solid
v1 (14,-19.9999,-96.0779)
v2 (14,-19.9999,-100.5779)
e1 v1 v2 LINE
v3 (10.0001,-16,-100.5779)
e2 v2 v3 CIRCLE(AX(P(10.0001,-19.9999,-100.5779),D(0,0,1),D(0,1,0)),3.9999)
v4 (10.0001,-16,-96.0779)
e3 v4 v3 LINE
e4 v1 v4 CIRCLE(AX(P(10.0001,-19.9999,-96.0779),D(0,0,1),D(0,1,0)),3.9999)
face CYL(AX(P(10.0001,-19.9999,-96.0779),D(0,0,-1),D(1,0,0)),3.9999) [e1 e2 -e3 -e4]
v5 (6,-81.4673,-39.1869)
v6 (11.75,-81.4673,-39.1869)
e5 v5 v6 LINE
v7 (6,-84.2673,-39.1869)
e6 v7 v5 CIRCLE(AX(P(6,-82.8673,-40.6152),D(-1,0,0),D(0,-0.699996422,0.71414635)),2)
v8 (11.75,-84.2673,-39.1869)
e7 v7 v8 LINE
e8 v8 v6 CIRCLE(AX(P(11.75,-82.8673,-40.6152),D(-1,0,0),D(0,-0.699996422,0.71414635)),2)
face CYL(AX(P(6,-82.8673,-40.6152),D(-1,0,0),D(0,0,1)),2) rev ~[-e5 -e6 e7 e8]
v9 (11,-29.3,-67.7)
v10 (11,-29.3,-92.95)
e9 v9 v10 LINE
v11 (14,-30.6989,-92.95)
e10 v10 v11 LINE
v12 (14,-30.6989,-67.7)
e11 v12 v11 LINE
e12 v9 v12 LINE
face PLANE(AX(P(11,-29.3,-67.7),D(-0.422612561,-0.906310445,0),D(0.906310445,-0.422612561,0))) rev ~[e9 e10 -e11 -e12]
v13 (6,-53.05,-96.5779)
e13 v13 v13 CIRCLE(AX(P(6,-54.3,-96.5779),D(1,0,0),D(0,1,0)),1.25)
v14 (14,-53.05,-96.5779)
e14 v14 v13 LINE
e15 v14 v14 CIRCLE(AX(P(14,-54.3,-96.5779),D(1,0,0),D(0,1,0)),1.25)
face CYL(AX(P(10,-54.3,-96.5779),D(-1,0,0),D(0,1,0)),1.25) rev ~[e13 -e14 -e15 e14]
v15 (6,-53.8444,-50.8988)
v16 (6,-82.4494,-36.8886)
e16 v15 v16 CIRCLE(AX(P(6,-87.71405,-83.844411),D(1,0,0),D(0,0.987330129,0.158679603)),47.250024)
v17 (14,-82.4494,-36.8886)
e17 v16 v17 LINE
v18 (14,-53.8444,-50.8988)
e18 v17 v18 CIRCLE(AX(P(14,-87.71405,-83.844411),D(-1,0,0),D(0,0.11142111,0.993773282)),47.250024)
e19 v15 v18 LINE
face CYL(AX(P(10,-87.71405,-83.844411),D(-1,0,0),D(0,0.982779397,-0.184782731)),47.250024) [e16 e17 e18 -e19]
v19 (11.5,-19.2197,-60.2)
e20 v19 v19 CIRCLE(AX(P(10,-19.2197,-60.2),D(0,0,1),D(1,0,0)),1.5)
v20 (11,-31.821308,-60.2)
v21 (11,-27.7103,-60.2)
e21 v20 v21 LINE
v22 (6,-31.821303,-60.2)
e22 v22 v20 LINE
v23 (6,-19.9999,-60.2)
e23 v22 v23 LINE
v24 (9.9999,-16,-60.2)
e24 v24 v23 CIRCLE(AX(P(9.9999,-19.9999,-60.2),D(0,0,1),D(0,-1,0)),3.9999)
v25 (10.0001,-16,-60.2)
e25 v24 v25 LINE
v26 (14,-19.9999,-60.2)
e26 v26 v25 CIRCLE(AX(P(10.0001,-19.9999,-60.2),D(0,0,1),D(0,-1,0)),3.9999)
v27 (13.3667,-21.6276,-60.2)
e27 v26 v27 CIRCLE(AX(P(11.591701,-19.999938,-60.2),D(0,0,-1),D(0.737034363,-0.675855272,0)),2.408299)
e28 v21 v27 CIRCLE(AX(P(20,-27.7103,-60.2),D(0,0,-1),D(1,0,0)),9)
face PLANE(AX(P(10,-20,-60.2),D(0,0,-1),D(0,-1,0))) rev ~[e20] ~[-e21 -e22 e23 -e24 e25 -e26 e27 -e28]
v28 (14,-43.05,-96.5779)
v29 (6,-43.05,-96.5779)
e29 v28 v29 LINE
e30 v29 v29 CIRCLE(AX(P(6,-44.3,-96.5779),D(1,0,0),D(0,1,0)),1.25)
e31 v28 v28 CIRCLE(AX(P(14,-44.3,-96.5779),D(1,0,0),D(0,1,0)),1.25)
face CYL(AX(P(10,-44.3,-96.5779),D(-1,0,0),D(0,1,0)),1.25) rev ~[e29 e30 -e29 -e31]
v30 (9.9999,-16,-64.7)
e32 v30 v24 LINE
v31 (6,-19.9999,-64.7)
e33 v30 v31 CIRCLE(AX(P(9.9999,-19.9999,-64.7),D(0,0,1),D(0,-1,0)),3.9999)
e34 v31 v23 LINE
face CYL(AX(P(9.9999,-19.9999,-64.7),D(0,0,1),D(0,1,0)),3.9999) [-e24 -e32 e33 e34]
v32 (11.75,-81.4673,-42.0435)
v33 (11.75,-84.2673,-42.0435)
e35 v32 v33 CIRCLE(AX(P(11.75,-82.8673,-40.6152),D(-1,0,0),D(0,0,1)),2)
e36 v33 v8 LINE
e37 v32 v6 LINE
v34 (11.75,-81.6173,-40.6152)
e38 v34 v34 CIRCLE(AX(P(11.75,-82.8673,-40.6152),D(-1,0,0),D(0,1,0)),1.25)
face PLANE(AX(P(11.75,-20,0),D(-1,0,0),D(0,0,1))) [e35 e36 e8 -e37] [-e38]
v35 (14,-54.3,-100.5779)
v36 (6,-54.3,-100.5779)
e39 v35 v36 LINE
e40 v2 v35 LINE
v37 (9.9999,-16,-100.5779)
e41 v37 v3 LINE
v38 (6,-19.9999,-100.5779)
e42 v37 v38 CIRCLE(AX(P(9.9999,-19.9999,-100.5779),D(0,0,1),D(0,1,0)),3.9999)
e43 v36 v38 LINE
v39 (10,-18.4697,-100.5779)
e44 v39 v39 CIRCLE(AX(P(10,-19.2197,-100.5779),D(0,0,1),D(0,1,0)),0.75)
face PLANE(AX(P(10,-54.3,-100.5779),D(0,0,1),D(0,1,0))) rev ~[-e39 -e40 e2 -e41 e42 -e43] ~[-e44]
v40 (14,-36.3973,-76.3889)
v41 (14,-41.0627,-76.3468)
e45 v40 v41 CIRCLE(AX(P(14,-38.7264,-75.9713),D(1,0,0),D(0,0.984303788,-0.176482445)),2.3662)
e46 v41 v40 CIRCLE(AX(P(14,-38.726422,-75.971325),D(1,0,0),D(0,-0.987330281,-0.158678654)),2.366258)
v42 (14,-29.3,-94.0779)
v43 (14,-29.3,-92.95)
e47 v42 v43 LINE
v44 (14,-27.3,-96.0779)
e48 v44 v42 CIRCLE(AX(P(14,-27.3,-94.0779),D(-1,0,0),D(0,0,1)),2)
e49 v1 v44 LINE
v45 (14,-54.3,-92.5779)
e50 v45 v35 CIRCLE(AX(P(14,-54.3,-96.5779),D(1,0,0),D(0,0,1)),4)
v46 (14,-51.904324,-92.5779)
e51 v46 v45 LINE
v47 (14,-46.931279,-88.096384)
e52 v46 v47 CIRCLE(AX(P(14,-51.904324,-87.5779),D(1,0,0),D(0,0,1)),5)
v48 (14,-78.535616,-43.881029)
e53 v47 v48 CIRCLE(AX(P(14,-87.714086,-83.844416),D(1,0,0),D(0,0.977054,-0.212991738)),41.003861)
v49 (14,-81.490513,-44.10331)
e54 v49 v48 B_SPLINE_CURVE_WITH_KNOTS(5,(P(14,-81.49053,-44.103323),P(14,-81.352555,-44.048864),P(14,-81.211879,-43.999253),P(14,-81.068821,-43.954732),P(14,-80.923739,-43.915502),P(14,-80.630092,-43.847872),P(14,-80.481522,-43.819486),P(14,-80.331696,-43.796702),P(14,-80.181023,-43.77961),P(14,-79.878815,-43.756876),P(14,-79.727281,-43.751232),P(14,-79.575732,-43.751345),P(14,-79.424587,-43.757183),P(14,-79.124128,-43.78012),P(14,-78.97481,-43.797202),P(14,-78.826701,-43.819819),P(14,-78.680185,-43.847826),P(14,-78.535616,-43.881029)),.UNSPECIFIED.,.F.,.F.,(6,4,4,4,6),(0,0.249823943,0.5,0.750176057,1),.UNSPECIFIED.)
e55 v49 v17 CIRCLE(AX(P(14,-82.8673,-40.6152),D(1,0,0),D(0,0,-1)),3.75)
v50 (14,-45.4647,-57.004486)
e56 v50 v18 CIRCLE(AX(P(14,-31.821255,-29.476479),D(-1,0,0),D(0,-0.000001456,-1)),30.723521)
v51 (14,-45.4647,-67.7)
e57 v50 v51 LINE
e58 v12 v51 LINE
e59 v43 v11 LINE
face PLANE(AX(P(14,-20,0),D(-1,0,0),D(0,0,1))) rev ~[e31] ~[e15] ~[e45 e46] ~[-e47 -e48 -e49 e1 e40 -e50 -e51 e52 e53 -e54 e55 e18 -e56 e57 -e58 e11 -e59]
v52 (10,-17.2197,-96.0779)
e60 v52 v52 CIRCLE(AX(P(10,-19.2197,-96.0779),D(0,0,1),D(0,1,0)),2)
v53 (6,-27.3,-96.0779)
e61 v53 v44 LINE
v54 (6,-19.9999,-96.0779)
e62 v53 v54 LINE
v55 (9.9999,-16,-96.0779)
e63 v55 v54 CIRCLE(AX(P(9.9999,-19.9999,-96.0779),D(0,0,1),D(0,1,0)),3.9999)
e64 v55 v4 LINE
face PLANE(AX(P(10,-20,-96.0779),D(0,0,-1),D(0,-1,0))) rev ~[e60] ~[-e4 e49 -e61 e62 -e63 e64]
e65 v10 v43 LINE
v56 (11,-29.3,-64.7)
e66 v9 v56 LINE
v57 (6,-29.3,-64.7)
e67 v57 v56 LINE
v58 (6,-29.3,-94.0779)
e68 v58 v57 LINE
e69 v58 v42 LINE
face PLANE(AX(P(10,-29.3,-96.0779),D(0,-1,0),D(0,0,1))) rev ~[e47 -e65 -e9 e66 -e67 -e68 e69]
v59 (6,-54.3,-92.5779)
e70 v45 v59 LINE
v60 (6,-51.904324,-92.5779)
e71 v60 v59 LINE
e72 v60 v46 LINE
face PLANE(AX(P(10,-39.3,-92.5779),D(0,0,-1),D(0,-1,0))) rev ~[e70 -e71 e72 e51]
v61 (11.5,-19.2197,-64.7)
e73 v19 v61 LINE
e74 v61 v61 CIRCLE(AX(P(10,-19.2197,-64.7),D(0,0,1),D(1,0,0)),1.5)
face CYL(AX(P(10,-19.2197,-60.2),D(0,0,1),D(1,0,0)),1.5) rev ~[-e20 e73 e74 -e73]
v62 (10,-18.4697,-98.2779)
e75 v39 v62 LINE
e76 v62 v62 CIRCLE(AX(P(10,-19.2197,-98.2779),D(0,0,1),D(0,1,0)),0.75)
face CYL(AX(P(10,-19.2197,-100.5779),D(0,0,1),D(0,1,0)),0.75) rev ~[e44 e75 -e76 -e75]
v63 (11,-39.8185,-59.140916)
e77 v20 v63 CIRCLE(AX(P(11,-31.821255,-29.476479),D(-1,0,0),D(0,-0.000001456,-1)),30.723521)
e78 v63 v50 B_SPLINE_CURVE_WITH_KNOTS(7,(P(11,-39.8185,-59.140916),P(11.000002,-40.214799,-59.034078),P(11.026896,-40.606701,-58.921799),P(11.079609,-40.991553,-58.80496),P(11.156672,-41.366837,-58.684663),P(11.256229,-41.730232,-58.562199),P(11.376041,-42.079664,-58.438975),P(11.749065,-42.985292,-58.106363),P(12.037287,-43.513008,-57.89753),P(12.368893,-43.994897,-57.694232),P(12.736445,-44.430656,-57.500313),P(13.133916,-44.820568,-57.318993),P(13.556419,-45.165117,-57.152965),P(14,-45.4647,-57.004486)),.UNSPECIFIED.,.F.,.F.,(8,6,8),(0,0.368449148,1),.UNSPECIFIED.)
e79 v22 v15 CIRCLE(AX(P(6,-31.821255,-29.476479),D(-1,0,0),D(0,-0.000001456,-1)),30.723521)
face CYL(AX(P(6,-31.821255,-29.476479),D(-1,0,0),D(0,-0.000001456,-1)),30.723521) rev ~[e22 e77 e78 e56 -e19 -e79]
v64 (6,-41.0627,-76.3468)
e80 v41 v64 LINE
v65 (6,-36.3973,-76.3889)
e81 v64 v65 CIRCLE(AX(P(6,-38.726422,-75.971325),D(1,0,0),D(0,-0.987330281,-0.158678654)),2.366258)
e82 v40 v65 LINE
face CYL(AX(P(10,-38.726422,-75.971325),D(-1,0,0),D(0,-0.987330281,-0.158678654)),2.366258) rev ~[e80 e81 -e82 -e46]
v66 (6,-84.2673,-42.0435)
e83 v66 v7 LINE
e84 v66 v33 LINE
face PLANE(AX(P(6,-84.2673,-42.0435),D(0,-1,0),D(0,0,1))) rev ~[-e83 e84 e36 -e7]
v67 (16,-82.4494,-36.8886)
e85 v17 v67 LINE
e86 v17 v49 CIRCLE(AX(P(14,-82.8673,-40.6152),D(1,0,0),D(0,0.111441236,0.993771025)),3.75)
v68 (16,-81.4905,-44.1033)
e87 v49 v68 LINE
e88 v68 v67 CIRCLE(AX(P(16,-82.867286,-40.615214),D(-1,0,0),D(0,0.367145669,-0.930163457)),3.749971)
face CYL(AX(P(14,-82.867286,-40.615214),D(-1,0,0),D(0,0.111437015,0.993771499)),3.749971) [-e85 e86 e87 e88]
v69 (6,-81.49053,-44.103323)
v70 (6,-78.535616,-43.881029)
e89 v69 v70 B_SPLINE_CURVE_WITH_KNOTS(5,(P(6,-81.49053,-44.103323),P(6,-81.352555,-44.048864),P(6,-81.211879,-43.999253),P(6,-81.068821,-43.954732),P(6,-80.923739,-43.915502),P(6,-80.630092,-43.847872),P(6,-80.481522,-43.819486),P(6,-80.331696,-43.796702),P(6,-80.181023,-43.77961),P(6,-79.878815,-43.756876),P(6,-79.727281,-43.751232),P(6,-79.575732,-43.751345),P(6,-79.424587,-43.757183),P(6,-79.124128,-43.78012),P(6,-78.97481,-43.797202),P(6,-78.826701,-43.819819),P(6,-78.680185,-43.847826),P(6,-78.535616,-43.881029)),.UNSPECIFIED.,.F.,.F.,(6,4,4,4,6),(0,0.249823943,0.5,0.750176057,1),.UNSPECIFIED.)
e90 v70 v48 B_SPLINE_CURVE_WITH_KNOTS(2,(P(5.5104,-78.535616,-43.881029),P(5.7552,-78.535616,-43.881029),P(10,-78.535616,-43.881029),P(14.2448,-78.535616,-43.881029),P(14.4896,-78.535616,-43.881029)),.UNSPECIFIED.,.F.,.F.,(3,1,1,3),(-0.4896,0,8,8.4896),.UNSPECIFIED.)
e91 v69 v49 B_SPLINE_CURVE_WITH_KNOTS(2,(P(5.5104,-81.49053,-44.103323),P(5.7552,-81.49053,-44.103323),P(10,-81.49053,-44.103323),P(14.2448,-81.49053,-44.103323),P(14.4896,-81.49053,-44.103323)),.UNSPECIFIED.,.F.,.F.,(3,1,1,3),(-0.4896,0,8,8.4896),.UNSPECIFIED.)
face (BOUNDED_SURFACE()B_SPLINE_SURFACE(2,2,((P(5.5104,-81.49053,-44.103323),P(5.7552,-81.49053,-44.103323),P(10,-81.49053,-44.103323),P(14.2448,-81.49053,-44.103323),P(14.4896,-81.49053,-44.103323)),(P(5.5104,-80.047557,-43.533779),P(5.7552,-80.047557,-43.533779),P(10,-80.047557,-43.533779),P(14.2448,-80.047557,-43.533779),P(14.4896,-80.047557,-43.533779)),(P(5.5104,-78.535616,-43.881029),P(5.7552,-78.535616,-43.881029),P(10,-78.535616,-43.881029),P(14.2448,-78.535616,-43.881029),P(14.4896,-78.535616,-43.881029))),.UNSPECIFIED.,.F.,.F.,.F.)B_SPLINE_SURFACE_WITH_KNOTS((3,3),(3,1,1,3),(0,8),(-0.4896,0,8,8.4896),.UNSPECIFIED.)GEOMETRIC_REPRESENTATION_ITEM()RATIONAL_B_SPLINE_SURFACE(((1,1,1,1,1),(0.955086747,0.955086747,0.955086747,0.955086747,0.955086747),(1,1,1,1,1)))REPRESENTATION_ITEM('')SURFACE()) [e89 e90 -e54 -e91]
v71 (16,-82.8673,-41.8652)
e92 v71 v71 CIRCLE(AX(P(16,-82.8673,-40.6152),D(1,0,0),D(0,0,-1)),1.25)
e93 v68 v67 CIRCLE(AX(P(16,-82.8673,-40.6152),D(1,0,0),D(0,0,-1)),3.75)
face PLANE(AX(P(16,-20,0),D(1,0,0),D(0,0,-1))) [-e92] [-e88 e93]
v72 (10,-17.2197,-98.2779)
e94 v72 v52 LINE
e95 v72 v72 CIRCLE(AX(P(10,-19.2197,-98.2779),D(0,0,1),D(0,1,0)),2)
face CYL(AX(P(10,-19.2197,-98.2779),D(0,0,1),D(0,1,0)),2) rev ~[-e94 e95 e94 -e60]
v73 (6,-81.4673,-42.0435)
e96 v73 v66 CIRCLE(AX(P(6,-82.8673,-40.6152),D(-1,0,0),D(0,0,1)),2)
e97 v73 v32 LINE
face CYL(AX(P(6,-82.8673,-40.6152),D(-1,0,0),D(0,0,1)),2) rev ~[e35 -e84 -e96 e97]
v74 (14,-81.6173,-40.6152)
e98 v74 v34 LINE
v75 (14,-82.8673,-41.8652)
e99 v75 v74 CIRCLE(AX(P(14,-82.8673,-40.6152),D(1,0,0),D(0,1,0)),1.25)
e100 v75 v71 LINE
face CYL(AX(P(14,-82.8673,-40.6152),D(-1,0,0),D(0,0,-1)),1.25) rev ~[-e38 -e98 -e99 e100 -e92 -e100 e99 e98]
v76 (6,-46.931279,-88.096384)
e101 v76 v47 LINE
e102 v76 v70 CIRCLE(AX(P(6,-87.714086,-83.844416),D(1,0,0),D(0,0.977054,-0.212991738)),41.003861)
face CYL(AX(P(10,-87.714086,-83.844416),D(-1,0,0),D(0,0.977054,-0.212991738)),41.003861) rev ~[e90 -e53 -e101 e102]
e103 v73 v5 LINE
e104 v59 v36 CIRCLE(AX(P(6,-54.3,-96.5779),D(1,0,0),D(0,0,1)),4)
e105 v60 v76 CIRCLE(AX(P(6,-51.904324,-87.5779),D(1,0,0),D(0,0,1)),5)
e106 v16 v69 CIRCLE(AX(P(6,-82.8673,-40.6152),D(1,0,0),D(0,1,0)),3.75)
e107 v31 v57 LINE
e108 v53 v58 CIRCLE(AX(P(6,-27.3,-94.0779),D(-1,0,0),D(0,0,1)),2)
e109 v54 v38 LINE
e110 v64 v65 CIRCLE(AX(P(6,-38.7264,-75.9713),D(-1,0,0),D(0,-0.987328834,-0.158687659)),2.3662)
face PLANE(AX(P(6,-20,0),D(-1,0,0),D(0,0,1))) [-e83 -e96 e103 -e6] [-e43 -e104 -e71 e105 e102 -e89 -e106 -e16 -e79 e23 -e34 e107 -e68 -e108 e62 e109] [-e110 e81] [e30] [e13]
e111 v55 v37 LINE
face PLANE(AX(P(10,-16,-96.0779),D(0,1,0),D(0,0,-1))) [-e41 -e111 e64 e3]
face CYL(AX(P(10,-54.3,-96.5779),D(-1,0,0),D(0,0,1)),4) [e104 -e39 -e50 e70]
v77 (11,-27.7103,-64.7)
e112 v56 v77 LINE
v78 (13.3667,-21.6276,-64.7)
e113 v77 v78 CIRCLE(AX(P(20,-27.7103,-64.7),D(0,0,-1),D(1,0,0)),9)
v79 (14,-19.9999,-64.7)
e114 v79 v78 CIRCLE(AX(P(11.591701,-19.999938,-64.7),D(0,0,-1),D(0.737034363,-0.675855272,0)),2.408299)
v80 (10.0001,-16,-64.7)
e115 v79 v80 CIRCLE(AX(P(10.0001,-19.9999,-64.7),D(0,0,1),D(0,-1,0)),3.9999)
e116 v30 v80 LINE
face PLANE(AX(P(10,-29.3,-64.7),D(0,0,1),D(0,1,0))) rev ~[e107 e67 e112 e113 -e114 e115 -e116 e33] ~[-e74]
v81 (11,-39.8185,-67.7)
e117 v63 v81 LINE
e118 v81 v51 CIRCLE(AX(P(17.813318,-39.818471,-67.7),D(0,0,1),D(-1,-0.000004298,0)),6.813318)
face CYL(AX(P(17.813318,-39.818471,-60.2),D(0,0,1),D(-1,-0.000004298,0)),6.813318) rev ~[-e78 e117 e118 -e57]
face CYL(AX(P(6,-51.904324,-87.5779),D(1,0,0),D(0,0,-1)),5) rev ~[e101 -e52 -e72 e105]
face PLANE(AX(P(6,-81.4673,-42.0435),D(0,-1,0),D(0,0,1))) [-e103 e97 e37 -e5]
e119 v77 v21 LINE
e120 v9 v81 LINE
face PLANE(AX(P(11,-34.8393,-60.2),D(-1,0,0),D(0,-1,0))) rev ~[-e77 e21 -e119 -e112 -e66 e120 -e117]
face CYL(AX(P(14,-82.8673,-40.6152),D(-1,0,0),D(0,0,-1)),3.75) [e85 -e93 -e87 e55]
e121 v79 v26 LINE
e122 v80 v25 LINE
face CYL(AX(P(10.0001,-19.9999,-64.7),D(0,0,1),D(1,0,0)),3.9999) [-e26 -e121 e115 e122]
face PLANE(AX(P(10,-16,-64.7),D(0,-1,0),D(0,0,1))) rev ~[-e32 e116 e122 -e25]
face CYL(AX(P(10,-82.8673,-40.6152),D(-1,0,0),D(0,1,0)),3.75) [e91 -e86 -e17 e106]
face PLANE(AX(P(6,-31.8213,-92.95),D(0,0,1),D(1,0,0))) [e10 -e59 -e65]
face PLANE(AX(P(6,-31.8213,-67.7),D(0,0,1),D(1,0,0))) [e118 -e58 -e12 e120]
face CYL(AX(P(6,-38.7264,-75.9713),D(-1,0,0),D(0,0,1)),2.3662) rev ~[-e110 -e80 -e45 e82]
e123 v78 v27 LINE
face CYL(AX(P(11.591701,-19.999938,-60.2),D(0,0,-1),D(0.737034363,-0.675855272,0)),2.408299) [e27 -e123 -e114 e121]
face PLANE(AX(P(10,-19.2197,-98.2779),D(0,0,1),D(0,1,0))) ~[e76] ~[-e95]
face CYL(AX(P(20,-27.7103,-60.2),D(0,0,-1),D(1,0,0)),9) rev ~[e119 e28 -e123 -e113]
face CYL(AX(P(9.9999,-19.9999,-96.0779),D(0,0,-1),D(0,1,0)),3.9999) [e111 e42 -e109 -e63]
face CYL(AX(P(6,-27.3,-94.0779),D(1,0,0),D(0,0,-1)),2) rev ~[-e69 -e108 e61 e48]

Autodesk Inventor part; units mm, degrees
ref_plane "YZ Plane" through (0, 0, 0) normal (1, 0, 0) x (0, 1, 0)
ref_plane "XZ Plane" through (0, 0, 0) normal (0, 1, 0) x (-1, 0, 0)
ref_plane "plane_main" through (10, -20, 0) normal (1, 0, 0) x (0, 1, 0)
sketch "Sketch1" plane through (10, -20, 0) normal (1, 0, 0) x (0, 1, 0)
  line L0 (0, -108) -> (0, 18)
  line L1 (20, -86.5) -> (15.45, -86.5) projected
  line L2 (-1.875, -97.5779) -> (1.875, -97.5779) projected
  line L3 (-2.5, -65.2) -> (2.5, -65.2) projected
  line L4 (4, -96.0779) -> (-9.3, -96.0779)
  line L5 (-9.3, -96.0779) -> (-9.3, -64.7)
  line L6 (-9.3, -64.7) -> (4, -64.7)
  line L7 (4, -64.7) -> (4, -60.2)
  line L8 (4, -60.2) -> (-13.4946, -60.2)
  line L9 (-13.4946, -60.2) -> (-19.3, -92.5779)
  line L10 (-19.3, -92.5779) -> (-34.3, -92.5779)
  line L11 (-34.3, -92.5779) -> (-34.3, -100.5779) construction
  line L12 (-34.3, -100.5779) -> (4, -100.5779)
  line L13 (4, -96.0779) -> (4, -100.5779)
  line L14 (-7.3, -86.5) -> (-7.3, -65.2) projected
  arc A0 (-34.3, -92.5779) -> (-34.3, -100.5779) centre (-34.3, -96.5779) ccw
  circle A1 centre (-34.3, -96.5779) radius 1.25
  circle A2 centre (-24.3, -96.5779) radius 1.25
  line L15 (-34.3, -96.5779) -> (-24.3, -96.5779) construction
  point P0 (20, 0)
  dimension "d0" = 0.5
  dimension "d1" = 1.5
  dimension "d2" = 4.5
  dimension "d3" = 4.5
  dimension "d4" = 8
  dimension "d7" = 31.3779
  dimension "d8" = 2.5
  dimension "d9" = 10
  dimension "d10" = 15
  dimension "d11" = 10
  dimension "d12" = 2
  dimension "d21" = 4
  dimension "d22" = 4
extrude "ext_main" add sketch "Sketch1" along normal mid plane 8 contours L12 A0 L10 L9 L8 L0 L6 L5 L4 | L0 L4 L13 L12 | L0 L8 L7 L6
fillet "Fillet1" radius 2 3 edges at (10, -39.3, -92.5779) (10, -33.4946, -60.2) (10, -29.3, -96.0779)
sketch "Sketch3" plane through (6, -16, -60.2) normal (0, 0, 1) x (1, 0, 0)
  circle A0 centre (4, -3.2197) radius 1.5
  point P0 (-6, 16)
  dimension "d17" = 3
extrude "ext_cut_topbore" cut sketch "Sketch3" against normal up to surface (4.5 mm away)
fillet "Fillet2" radius 4 4 edges at (14, -16, -62.45) (6, -16, -62.45) (14, -16, -98.3279) (6, -16, -98.3279)
ref_plane "Work Plane2" through (6, -31.8213, -60.2) normal (0, 0, 1) x (1, 0, 0)
sketch "Sketch5" plane through (6, -31.8213, -60.2) normal (0, 0, 1) x (1, 0, 0)
  line L0 (8, 11.8213) -> (8, 0) projected
  circle A0 centre (14, 4.111) radius 9
  circle A1 centre (4, 12.6016) radius 1.5 projected
  arc A2 (8, 11.8213) -> (0, 11.8213) centre (4, 11.8213) ccw projected
  arc A3 (7.3667, 10.1937) -> (8, 11.8213) centre (5.5918, 11.8213) ccw
  line L1 (8, 11.8213) -> (8, 10.8192)
  line L2 (5, 4.111) -> (5, -4.889)
  line L3 (5, -4.889) -> (14, -4.889)
  point P0 (-6, 31.8213)
  point P1 (4, 12.611)
  dimension "d27" = 18
  dimension "d28" = 8.5
  dimension "d29" = 10
extrude "ext_cut_motor_cutway" cut sketch "Sketch5" along normal mid plane 15 contours L0 A0 A3 | A0 | A0 L3 L2
fillet "Fillet4" [suppressed]
sketch "Sketch6" plane through (10, -20, 0) normal (1, 0, 0) x (0, 1, 0)
  line L0 (0, -96.0779) -> (0, -96.0779) projected
  line L1 (-7.3, -96.0779) -> (0, -96.0779) projected
  line L2 (0, -96.0779) -> (-7.3, -96.0779) projected
  line L3 (0, -100.5779) -> (0, -100.5779) projected
  line L4 (-34.3, -100.5779) -> (0, -100.5779) projected
  line L5 (0, -100.5779) -> (-34.3, -100.5779) projected
  line L6 (0.7803, -108) -> (0.7803, 18) construction
  line L7 (0.7803, -96.0779) -> (0.7803, -100.5779)
  line L8 (1.5303, -100.5779) -> (1.5303, -98.2779)
  line L9 (1.5303, -98.2779) -> (2.7803, -98.2779)
  line L10 (2.7803, -98.2779) -> (2.7803, -96.0779)
  line L11 (2.7803, -96.0779) -> (0.7803, -96.0779)
  line L12 (0, -96.0779) -> (-7.3, -96.0779) projected
  line L13 (0.7803, -100.5779) -> (1.5303, -100.5779)
  line L14 (-34.3, -100.5779) -> (0, -100.5779) projected
  point P0 (20, 0)
  dimension "d37" = 0.75
  dimension "d38" = 2
  dimension "d39" = 2.2
revolve "revolution_servohubfit" cut sketch "Sketch6" angle 360 about axis through (10, -19.2197, -108) along (0, 0, 1)
sketch "Sketch7" plane through (10, -20, 0) normal (1, 0, 0) x (0, 1, 0)
  line L0 (0, -100.5779) -> (0, -96.0779) projected
  line L1 (0, -100.5779) -> (-34.3, -100.5779) projected
  arc A0 (-34.3, -92.5779) -> (-34.3, -100.5779) centre (-34.3, -96.5779) ccw projected
  line L2 (-34.3, -92.5779) -> (-20.9733, -92.5779) projected
  arc A1 (-20.9733, -92.5779) -> (-19.0047, -90.9309) centre (-20.9733, -90.5779) ccw projected
  line L3 (-19.0047, -90.9309) -> (-13.7899, -61.847) projected
  arc A2 (-11.8213, -60.2) -> (-13.7899, -61.847) centre (-11.8213, -62.2) ccw projected
  line L4 (-11.8213, -60.2) -> (0, -60.2) projected
  line L5 (0, -64.7) -> (0, -60.2) projected
  line L6 (0, -64.7) -> (-9.3, -64.7) projected
  line L7 (-9.3, -64.7) -> (-9.3, -94.0779) projected
  arc A3 (-9.3, -94.0779) -> (-7.3, -96.0779) centre (-7.3, -94.0779) ccw projected
  line L8 (-7.3, -96.0779) -> (0, -96.0779) projected
  circle A4 centre (-34.3, -96.5779) radius 1.25 projected
  circle A5 centre (-24.3, -96.5779) radius 1.25 projected
  line L9 (-34.3, -96.5779) -> (-24.3, -96.5779)
  line L10 (-24.3, -96.5779) -> (-24.3, -86.5779)
  line L11 (-24.3, -86.5779) -> (-62.8673, -40.6152) construction
  line L12 (-24.3, -86.5779) -> (-34.3, -96.5779) construction
  circle A6 centre (-62.8673, -40.6152) radius 1.25
  arc A7 (-24.3, -86.5779) -> (-62.8673, -40.6152) centre (-67.714, -83.8444) ccw construction
  line L13 (-34.3911, -55.8831) -> (-43.5836, -63.5965) construction
  circle A8 centre (-62.8673, -40.6152) radius 3.75
  line L14 (-19.0047, -90.9309) -> (-13.7899, -61.847) projected
  arc A9 (-24.3, -86.5779) -> (-59.1621, -41.1933) centre (-67.714, -83.8444) ccw
  arc A10 (-27.6511, -92.5779) -> (-60.4568, -43.4879) centre (-67.714, -83.8444) ccw
  line L15 (-19.2993, -92.5738) -> (-19.2993, -100.5779)
  line L16 (-24.3, -92.5779) -> (-24.3, -95.3279)
  line L17 (-19.2993, -95.3279) -> (-24.3, -95.3279)
  arc A11 (-21.0627, -76.3468) -> (-16.3973, -76.3889) centre (-18.7264, -75.9713) ccw
  line L18 (-14.8394, -67.7) -> (-19.0047, -90.9309) projected
  arc A12 (-62.0154, -36.9632) -> (-62.0154, -36.9632) centre (-74.2254, -89.308) ccw
  arc A13 (-21.2777, -92.5754) -> (-62.4494, -36.8886) centre (-67.714, -83.8444) ccw
  point P0 (20, 0)
  point P1 (-15.2647, -70.072)
  dimension "d41" = 60
  dimension "d43" = 10
  dimension "d44" = 140
  dimension "d45" = 2.5
  dimension "d46" = 12
  dimension "d53" = 2.5
extrude "Extrusion7" add sketch "Sketch7" along normal mid plane 8 contours A13 A12 | A12 A8 A13 | A12 A1 L2 L10 A9 A8 | A8 | A11 L3 A1 A12 A13 | A10 A8 A9 L10 L2
fillet "Fillet7" radius 5 2 edges at (10, -80.4568, -43.4879) (10, -47.6511, -92.5779)
sketch "Sketch11" plane through (6, -20, 0) normal (-1, 0, 0) x (0, 0, 1)
  circle A0 centre (-40.6152, -62.8673) radius 1.25 projected
  arc A1 (-44.1033, -61.4905) -> (-36.8886, -62.4494) centre (-40.6152, -62.8673) ccw projected
  line L0 (-96.0779, -7.3) -> (-96.0779, 0) projected
  circle A2 centre (-40.6152, -62.8673) radius 2
  line L1 (-42.6152, -62.8673) -> (-38.6152, -62.8673) construction
  line L2 (-120.6935, 20) -> (20.1156, 20) projected
  line L3 (-42.0435, -61.4673) -> (-39.1869, -61.4673)
  line L4 (-42.0435, -64.2673) -> (-39.1869, -64.2673)
  point P0 (0, 20)
  dimension "d68" = 4
  dimension "d69" = 2.8
extrude "Extrusion11" cut sketch "Sketch11" against normal blind 5.75 contours A0 | A2 L4 L3
sketch "Sketch12" plane through (14, -20, 0) normal (1, 0, 0) x (0, 0, -1)
  circle A0 centre (40.6152, -62.8673) radius 1.25 projected
  arc A1 (36.8886, -62.4494) -> (44.1033, -61.4905) centre (40.6152, -62.8673) ccw projected
  circle A2 centre (40.6152, -62.8673) radius 3.75
  point P0 (0, 20)
extrude "Extrusion12" add sketch "Sketch12" along normal blind 2
sketch "Sketch15" plane through (6, -20, 0) normal (-1, 0, 0) x (0, 0, 1)
  arc A0 (-36.8886, -62.4494) -> (-76.3468, -21.0627) centre (-83.8444, -67.714) ccw projected
  arc A1 (-76.3889, -16.3973) -> (-76.3468, -21.0627) centre (-75.9713, -18.7264) ccw projected
  line L0 (-76.3889, -16.3973) -> (-61.847, -13.7899) projected
  arc A2 (-61.847, -13.7899) -> (-60.2, -11.8213) centre (-62.2, -11.8213) ccw projected
  line L1 (-60.2, -11.8213) -> (-60.2, 0) projected
  arc A3 (-60.2, -11.8213) -> (-50.8988, -33.8444) centre (-29.4767, -11.8213) ccw
  circle A4 centre (-75.9713, -18.7264) radius 2.3662
  line L2 (-76.3889, -16.3973) -> (-61.847, -13.7899)
  arc A5 (-61.847, -13.7899) -> (-60.2, -11.8213) centre (-62.2, -11.8213) ccw
  arc A6 (-50.8988, -33.8444) -> (-76.3468, -21.0627) centre (-83.8444, -67.714) ccw
  point P0 (0, 20)
extrude "Extrusion14" add sketch "Sketch15" against normal blind 8 contours A0 A4 L0 A2 A3
sketch "Sketch16" plane through (6, -31.8213, -60.2) normal (0, 0, 1) x (1, 0, 0)
  line L0 (8, -3.018) -> (5, -3.018) projected
  line L1 (8, 2.5213) -> (8, -3.018) projected
  line L2 (5, 2.5213) -> (8, 2.5213) projected
  line L3 (5, -3.018) -> (5, 2.5213) projected
  line L4 (8, 0) -> (8, -22.023) projected
  line L5 (5, -3.018) -> (5, -7.9972)
  arc A0 (5, -7.9972) -> (8, -13.6434) centre (11.8132, -7.9972) ccw
  line L6 (8, -13.6434) -> (8, -3.018)
  line L7 (8, -3.018) -> (5, -3.018)
  point P0 (-6, 31.8213)
extrude "Extrusion15" cut sketch "Sketch16" against normal blind 7.5 and the other way blind 4
sketch "Sketch17" plane through (6, -31.8213, -67.7) normal (0, 0, 1) x (1, 0, 0)
  line L0 (8, 2.5213) -> (8, -13.6434) projected
  line L1 (5, 2.5213) -> (8, 2.5213) projected
  line L2 (5, 2.5213) -> (8, 1.1224)
  line L3 (8, 1.1224) -> (8, 2.5213)
  line L4 (8, 2.5213) -> (5, 2.5213)
  point P0 (-6, 31.8213)
  dimension "d85" = 25
extrude "Extrusion16" cut sketch "Sketch17" against normal blind 25.25
equation "\"d8\" = screw_m2_bore_loose"
equation "\"d21\" = 0.5 * model_main_thickness"
equation "\"d22\" = 0.5 * model_main_thickness"
equation "\"d5\" = model_main_thickness"
equation "\"d17\" = screw_m3_bore_selfthreading"
equation "\"d20\" = 0.5 * model_main_thickness"
equation "\"d36\" = 0.5 * model_main_thickness"
equation "\"d37\" = 0.5 * model_servoscrew_diam"
equation "\"d38\" = 0.5 * model_servohub_diam"
equation "\"d45\" = screw_m2_bore_loose"
equation "\"d54\" = model_main_thickness"
equation "\"d76\" = model_main_thickness"
equation "\"model_main_thickness\" = 8"
equation "\"model_servoscrew_diam\" = 1.5"
equation "\"model_servohub_diam\" = 4"
equation "\"screw_m2_bore_loose\" = 2.5"
equation "\"screw_m3_bore_selfthreading\" = 3"
properties part number "thumb_base"
